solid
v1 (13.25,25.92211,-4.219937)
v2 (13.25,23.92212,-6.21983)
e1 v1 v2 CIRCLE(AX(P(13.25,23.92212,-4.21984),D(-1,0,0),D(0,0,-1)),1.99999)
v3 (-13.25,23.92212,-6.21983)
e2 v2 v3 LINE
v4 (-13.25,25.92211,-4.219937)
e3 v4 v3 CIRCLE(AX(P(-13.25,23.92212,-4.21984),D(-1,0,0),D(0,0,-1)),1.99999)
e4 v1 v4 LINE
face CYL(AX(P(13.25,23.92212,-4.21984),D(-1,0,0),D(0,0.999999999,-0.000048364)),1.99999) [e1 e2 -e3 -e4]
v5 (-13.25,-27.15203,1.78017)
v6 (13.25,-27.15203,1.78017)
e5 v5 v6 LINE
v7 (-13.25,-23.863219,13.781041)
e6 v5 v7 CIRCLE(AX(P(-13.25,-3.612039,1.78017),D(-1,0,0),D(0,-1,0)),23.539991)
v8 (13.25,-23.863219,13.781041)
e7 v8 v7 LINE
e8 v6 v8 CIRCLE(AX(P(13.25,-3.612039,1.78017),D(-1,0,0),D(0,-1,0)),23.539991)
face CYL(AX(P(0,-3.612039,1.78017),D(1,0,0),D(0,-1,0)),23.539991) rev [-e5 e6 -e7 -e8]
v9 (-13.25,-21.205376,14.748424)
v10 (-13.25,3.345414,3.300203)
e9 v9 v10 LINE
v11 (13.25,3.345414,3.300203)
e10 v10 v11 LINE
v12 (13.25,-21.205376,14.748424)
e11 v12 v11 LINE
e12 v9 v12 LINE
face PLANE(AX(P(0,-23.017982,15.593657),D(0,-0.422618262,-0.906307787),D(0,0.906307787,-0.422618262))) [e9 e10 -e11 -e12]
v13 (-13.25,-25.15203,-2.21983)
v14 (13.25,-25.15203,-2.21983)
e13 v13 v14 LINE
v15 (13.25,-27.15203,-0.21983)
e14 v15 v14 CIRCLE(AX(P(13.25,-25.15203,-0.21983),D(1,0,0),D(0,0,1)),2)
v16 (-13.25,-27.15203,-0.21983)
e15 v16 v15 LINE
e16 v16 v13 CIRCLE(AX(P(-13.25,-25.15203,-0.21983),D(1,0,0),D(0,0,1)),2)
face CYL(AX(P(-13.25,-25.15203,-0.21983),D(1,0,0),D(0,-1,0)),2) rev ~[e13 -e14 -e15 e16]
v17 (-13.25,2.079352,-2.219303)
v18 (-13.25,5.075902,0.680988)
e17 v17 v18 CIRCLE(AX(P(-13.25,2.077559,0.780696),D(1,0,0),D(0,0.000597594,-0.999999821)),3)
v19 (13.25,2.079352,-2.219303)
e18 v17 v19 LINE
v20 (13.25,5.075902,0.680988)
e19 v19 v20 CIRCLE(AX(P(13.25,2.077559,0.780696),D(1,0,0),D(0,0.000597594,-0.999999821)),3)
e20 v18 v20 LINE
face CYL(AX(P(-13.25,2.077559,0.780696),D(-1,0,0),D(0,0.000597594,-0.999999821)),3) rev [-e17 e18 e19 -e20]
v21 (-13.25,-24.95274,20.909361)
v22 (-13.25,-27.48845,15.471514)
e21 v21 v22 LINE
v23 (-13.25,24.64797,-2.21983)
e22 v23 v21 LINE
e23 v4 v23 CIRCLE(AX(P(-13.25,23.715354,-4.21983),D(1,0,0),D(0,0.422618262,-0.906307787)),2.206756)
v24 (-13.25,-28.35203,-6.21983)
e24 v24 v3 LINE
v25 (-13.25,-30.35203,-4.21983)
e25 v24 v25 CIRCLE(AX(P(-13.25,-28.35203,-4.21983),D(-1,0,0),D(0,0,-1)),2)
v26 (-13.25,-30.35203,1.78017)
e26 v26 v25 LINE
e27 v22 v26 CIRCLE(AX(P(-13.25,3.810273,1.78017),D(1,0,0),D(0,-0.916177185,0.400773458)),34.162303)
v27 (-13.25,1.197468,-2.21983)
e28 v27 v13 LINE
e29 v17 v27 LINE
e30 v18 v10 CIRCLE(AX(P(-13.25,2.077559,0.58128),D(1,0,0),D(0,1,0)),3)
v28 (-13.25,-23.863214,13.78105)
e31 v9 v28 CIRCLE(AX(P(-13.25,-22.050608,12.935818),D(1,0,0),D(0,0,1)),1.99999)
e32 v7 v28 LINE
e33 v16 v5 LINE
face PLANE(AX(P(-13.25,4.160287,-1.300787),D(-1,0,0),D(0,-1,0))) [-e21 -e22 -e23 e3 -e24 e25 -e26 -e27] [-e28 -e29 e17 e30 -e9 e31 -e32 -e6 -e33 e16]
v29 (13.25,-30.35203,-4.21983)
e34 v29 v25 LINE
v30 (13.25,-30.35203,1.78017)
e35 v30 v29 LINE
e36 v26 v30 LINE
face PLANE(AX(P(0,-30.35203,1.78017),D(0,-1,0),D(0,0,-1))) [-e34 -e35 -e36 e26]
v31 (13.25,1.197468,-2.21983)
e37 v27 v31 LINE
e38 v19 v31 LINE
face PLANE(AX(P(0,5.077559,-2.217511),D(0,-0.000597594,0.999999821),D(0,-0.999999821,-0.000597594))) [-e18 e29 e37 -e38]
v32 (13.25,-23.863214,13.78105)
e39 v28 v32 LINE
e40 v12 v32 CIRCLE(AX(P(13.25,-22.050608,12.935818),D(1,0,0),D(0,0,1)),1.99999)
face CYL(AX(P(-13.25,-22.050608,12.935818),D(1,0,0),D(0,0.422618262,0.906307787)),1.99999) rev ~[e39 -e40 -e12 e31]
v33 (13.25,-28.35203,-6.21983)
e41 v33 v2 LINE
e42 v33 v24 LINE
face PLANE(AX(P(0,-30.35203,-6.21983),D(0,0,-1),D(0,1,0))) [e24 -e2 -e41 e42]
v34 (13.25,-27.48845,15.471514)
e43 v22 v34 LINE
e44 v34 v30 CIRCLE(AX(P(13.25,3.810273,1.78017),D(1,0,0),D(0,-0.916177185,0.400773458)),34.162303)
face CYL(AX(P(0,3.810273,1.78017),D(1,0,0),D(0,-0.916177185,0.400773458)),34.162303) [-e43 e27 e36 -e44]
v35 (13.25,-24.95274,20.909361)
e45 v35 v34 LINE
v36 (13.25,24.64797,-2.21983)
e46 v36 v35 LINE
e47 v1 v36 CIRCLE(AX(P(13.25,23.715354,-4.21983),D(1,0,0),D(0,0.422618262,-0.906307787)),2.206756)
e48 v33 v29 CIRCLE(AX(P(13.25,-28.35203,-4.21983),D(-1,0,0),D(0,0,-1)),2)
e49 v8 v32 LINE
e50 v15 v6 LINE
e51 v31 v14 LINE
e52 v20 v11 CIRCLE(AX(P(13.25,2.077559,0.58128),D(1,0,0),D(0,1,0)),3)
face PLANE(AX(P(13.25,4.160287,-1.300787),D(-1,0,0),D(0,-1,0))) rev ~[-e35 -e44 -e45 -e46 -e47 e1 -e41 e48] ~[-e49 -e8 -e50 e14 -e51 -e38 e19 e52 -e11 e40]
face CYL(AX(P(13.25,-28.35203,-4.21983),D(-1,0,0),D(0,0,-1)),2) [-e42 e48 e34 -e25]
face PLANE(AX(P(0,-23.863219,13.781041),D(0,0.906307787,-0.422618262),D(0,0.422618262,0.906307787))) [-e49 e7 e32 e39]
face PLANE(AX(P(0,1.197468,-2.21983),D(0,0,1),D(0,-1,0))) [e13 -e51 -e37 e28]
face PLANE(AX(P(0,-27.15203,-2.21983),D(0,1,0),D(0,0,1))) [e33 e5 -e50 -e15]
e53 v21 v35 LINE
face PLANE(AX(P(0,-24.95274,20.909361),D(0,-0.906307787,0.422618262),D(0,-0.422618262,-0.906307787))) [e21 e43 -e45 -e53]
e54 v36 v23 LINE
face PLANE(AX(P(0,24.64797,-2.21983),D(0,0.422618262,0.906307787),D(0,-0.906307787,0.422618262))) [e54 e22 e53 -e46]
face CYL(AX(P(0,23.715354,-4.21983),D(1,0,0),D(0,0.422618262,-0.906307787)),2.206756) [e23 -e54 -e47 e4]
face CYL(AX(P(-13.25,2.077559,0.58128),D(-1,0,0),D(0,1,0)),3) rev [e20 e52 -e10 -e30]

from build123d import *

# Parameters (mm, degrees)
F1_DEPTH    = 13.25
F2_DEPTH    = 13.25
F3_R        = 1.99999
F4_R        = 2
F5_T1_DEPTH = 26.5


# Not quite as in the source:
# - a fillet or chamfer that OpenCascade refuses, or shapes differently, is made with other operations: its cross-section is extruded or revolved along the edge and cut away or added
# - a fillet or chamfer is up to 0.001 mm smaller than in the source, because OpenCascade refuses the exact size
# - a feature names something its author has since deleted; it is built from what else it names


with BuildPart() as f1:
    # F0 (on Right) → F1 (new body, symmetric)
    with BuildSketch(Plane.YZ):
        with BuildLine():
            Line((24.6479697927, -2.219830174), (-24.9527402653, 20.909360776))
            Line((-24.9527402653, 20.909360776), (-27.4884498358, 15.4715140538))
            Line((-27.4884498358, 15.4715140538), (-23.8632186876, 13.7810410068))
            Line((-23.8632186876, 13.7810410068), (-23.0179821641, 15.5936565809))
            Line((-23.0179821641, 15.5936565809), (5.077559234, 2.4924904669))
            Line((5.077559234, 2.4924904669), (7.7964825951, 1.2246356817))
            Line((7.7964825951, 1.2246356817), (15.1652631053, -2.2114831015))
            Line((15.1652631053, -2.2114831015), (5.077559234, -2.2175114543))
            Line((5.077559234, -2.2175114543), (1.1974681402, -2.219830174))
            Line((1.1974681402, -2.219830174), (-27.1520302073, -2.219830174))
            Line((-27.1520302073, -2.219830174), (-27.1520302073, 1.780169826))
            Line((-27.1520302073, 1.780169826), (-30.3520302073, 1.780169826))
            Line((-30.3520302073, 1.780169826), (-30.3520302073, -6.219830174))
            Line((-30.3520302073, -6.219830174), (24.6479697927, -6.219830174))
            ThreePointArc((24.6479697927, -6.219830174), (25.9221103143, -4.219830174), (24.6479697927, -2.219830174))
        make_face()
        with BuildLine():
            Line((-23.8632186876, 13.7810410068), (-27.4884498358, 15.4715140538))
            ThreePointArc((-27.4884498358, 15.4715140538), (-29.6284726398, 8.7739706401), (-30.3520302073, 1.780169826))
            Line((-30.3520302073, 1.780169826), (-27.1520302073, 1.780169826))
            ThreePointArc((-27.1520302073, 1.780169826), (-26.3149438564, 8.0018494688), (-23.8632186876, 13.7810410068))
        make_face()
        Polygon((7.7964825951, 1.2246356817), (5.077559234, 2.4924904669), (5.077559234, -2.2175114543), (15.1652631053, -2.2114831015), align=None)
    extrude(amount=F1_DEPTH, both=True)

    # F0 (on Right) → F2 (join, symmetric)
    with BuildSketch(Plane.YZ):
        with BuildLine():
            Line((24.6479697927, -2.219830174), (-24.9527402653, 20.909360776))
            Line((-24.9527402653, 20.909360776), (-27.4884498358, 15.4715140538))
            Line((-27.4884498358, 15.4715140538), (-23.8632186876, 13.7810410068))
            Line((-23.8632186876, 13.7810410068), (-23.0179821641, 15.5936565809))
            Line((-23.0179821641, 15.5936565809), (5.077559234, 2.4924904669))
            Line((5.077559234, 2.4924904669), (7.7964825951, 1.2246356817))
            Line((7.7964825951, 1.2246356817), (15.1652631053, -2.2114831015))
            Line((15.1652631053, -2.2114831015), (5.077559234, -2.2175114543))
            Line((5.077559234, -2.2175114543), (1.1974681402, -2.219830174))
            Line((1.1974681402, -2.219830174), (-27.1520302073, -2.219830174))
            Line((-27.1520302073, -2.219830174), (-27.1520302073, 1.780169826))
            Line((-27.1520302073, 1.780169826), (-30.3520302073, 1.780169826))
            Line((-30.3520302073, 1.780169826), (-30.3520302073, -6.219830174))
            Line((-30.3520302073, -6.219830174), (24.6479697927, -6.219830174))
            ThreePointArc((24.6479697927, -6.219830174), (25.9221103143, -4.219830174), (24.6479697927, -2.219830174))
        make_face()
    extrude(amount=F2_DEPTH, both=True)

    # F3 (radius 2 in the source; OpenCascade refuses exactly that, so slightly less here)
    f3_edges = [f1.edges().sort_by_distance(p)[0] for p in [
        (0, -23.017982, 15.593657),
        (0, 24.64797, -2.21983),
        (0, 24.64797, -6.21983),
    ]]
    fillet(f3_edges, radius=F3_R)

    # F4
    f4_edges = [f1.edges().sort_by_distance(p)[0] for p in [
        (0, -27.15203, -2.21983),
        (0, -30.35203, -6.21983),
        (0, -30.35203, 1.78017),
    ]]
    fillet(f4_edges, radius=F4_R)

    # F5: fillet of radius 3 on 2 edges, made by hand

    # F5_s2 → F5_t1 (join)
    with BuildSketch(Plane.YZ.offset(-13.25)):
        with BuildLine():
            ThreePointArc((2.0793520161, -2.2193031654), (4.1995133271, -1.3399901057), (5.077559234, 0.780696299))
            Line((5.077559234, 0.780696299), (5.077559234, -2.2175114543))
            Line((5.077559234, -2.2175114543), (2.0793520161, -2.2193031654))
        make_face()
        with BuildLine():
            ThreePointArc((5.077559234, 0.5812796845), (4.6077335715, 2.1931785095), (3.3454140192, 3.3002030456))
            Line((3.3454140192, 3.3002030456), (5.077559234, 2.4924904669))
            Line((5.077559234, 2.4924904669), (5.077559234, 0.5812796845))
        make_face()
    extrude(amount=F5_T1_DEPTH)


solid = f1.part
